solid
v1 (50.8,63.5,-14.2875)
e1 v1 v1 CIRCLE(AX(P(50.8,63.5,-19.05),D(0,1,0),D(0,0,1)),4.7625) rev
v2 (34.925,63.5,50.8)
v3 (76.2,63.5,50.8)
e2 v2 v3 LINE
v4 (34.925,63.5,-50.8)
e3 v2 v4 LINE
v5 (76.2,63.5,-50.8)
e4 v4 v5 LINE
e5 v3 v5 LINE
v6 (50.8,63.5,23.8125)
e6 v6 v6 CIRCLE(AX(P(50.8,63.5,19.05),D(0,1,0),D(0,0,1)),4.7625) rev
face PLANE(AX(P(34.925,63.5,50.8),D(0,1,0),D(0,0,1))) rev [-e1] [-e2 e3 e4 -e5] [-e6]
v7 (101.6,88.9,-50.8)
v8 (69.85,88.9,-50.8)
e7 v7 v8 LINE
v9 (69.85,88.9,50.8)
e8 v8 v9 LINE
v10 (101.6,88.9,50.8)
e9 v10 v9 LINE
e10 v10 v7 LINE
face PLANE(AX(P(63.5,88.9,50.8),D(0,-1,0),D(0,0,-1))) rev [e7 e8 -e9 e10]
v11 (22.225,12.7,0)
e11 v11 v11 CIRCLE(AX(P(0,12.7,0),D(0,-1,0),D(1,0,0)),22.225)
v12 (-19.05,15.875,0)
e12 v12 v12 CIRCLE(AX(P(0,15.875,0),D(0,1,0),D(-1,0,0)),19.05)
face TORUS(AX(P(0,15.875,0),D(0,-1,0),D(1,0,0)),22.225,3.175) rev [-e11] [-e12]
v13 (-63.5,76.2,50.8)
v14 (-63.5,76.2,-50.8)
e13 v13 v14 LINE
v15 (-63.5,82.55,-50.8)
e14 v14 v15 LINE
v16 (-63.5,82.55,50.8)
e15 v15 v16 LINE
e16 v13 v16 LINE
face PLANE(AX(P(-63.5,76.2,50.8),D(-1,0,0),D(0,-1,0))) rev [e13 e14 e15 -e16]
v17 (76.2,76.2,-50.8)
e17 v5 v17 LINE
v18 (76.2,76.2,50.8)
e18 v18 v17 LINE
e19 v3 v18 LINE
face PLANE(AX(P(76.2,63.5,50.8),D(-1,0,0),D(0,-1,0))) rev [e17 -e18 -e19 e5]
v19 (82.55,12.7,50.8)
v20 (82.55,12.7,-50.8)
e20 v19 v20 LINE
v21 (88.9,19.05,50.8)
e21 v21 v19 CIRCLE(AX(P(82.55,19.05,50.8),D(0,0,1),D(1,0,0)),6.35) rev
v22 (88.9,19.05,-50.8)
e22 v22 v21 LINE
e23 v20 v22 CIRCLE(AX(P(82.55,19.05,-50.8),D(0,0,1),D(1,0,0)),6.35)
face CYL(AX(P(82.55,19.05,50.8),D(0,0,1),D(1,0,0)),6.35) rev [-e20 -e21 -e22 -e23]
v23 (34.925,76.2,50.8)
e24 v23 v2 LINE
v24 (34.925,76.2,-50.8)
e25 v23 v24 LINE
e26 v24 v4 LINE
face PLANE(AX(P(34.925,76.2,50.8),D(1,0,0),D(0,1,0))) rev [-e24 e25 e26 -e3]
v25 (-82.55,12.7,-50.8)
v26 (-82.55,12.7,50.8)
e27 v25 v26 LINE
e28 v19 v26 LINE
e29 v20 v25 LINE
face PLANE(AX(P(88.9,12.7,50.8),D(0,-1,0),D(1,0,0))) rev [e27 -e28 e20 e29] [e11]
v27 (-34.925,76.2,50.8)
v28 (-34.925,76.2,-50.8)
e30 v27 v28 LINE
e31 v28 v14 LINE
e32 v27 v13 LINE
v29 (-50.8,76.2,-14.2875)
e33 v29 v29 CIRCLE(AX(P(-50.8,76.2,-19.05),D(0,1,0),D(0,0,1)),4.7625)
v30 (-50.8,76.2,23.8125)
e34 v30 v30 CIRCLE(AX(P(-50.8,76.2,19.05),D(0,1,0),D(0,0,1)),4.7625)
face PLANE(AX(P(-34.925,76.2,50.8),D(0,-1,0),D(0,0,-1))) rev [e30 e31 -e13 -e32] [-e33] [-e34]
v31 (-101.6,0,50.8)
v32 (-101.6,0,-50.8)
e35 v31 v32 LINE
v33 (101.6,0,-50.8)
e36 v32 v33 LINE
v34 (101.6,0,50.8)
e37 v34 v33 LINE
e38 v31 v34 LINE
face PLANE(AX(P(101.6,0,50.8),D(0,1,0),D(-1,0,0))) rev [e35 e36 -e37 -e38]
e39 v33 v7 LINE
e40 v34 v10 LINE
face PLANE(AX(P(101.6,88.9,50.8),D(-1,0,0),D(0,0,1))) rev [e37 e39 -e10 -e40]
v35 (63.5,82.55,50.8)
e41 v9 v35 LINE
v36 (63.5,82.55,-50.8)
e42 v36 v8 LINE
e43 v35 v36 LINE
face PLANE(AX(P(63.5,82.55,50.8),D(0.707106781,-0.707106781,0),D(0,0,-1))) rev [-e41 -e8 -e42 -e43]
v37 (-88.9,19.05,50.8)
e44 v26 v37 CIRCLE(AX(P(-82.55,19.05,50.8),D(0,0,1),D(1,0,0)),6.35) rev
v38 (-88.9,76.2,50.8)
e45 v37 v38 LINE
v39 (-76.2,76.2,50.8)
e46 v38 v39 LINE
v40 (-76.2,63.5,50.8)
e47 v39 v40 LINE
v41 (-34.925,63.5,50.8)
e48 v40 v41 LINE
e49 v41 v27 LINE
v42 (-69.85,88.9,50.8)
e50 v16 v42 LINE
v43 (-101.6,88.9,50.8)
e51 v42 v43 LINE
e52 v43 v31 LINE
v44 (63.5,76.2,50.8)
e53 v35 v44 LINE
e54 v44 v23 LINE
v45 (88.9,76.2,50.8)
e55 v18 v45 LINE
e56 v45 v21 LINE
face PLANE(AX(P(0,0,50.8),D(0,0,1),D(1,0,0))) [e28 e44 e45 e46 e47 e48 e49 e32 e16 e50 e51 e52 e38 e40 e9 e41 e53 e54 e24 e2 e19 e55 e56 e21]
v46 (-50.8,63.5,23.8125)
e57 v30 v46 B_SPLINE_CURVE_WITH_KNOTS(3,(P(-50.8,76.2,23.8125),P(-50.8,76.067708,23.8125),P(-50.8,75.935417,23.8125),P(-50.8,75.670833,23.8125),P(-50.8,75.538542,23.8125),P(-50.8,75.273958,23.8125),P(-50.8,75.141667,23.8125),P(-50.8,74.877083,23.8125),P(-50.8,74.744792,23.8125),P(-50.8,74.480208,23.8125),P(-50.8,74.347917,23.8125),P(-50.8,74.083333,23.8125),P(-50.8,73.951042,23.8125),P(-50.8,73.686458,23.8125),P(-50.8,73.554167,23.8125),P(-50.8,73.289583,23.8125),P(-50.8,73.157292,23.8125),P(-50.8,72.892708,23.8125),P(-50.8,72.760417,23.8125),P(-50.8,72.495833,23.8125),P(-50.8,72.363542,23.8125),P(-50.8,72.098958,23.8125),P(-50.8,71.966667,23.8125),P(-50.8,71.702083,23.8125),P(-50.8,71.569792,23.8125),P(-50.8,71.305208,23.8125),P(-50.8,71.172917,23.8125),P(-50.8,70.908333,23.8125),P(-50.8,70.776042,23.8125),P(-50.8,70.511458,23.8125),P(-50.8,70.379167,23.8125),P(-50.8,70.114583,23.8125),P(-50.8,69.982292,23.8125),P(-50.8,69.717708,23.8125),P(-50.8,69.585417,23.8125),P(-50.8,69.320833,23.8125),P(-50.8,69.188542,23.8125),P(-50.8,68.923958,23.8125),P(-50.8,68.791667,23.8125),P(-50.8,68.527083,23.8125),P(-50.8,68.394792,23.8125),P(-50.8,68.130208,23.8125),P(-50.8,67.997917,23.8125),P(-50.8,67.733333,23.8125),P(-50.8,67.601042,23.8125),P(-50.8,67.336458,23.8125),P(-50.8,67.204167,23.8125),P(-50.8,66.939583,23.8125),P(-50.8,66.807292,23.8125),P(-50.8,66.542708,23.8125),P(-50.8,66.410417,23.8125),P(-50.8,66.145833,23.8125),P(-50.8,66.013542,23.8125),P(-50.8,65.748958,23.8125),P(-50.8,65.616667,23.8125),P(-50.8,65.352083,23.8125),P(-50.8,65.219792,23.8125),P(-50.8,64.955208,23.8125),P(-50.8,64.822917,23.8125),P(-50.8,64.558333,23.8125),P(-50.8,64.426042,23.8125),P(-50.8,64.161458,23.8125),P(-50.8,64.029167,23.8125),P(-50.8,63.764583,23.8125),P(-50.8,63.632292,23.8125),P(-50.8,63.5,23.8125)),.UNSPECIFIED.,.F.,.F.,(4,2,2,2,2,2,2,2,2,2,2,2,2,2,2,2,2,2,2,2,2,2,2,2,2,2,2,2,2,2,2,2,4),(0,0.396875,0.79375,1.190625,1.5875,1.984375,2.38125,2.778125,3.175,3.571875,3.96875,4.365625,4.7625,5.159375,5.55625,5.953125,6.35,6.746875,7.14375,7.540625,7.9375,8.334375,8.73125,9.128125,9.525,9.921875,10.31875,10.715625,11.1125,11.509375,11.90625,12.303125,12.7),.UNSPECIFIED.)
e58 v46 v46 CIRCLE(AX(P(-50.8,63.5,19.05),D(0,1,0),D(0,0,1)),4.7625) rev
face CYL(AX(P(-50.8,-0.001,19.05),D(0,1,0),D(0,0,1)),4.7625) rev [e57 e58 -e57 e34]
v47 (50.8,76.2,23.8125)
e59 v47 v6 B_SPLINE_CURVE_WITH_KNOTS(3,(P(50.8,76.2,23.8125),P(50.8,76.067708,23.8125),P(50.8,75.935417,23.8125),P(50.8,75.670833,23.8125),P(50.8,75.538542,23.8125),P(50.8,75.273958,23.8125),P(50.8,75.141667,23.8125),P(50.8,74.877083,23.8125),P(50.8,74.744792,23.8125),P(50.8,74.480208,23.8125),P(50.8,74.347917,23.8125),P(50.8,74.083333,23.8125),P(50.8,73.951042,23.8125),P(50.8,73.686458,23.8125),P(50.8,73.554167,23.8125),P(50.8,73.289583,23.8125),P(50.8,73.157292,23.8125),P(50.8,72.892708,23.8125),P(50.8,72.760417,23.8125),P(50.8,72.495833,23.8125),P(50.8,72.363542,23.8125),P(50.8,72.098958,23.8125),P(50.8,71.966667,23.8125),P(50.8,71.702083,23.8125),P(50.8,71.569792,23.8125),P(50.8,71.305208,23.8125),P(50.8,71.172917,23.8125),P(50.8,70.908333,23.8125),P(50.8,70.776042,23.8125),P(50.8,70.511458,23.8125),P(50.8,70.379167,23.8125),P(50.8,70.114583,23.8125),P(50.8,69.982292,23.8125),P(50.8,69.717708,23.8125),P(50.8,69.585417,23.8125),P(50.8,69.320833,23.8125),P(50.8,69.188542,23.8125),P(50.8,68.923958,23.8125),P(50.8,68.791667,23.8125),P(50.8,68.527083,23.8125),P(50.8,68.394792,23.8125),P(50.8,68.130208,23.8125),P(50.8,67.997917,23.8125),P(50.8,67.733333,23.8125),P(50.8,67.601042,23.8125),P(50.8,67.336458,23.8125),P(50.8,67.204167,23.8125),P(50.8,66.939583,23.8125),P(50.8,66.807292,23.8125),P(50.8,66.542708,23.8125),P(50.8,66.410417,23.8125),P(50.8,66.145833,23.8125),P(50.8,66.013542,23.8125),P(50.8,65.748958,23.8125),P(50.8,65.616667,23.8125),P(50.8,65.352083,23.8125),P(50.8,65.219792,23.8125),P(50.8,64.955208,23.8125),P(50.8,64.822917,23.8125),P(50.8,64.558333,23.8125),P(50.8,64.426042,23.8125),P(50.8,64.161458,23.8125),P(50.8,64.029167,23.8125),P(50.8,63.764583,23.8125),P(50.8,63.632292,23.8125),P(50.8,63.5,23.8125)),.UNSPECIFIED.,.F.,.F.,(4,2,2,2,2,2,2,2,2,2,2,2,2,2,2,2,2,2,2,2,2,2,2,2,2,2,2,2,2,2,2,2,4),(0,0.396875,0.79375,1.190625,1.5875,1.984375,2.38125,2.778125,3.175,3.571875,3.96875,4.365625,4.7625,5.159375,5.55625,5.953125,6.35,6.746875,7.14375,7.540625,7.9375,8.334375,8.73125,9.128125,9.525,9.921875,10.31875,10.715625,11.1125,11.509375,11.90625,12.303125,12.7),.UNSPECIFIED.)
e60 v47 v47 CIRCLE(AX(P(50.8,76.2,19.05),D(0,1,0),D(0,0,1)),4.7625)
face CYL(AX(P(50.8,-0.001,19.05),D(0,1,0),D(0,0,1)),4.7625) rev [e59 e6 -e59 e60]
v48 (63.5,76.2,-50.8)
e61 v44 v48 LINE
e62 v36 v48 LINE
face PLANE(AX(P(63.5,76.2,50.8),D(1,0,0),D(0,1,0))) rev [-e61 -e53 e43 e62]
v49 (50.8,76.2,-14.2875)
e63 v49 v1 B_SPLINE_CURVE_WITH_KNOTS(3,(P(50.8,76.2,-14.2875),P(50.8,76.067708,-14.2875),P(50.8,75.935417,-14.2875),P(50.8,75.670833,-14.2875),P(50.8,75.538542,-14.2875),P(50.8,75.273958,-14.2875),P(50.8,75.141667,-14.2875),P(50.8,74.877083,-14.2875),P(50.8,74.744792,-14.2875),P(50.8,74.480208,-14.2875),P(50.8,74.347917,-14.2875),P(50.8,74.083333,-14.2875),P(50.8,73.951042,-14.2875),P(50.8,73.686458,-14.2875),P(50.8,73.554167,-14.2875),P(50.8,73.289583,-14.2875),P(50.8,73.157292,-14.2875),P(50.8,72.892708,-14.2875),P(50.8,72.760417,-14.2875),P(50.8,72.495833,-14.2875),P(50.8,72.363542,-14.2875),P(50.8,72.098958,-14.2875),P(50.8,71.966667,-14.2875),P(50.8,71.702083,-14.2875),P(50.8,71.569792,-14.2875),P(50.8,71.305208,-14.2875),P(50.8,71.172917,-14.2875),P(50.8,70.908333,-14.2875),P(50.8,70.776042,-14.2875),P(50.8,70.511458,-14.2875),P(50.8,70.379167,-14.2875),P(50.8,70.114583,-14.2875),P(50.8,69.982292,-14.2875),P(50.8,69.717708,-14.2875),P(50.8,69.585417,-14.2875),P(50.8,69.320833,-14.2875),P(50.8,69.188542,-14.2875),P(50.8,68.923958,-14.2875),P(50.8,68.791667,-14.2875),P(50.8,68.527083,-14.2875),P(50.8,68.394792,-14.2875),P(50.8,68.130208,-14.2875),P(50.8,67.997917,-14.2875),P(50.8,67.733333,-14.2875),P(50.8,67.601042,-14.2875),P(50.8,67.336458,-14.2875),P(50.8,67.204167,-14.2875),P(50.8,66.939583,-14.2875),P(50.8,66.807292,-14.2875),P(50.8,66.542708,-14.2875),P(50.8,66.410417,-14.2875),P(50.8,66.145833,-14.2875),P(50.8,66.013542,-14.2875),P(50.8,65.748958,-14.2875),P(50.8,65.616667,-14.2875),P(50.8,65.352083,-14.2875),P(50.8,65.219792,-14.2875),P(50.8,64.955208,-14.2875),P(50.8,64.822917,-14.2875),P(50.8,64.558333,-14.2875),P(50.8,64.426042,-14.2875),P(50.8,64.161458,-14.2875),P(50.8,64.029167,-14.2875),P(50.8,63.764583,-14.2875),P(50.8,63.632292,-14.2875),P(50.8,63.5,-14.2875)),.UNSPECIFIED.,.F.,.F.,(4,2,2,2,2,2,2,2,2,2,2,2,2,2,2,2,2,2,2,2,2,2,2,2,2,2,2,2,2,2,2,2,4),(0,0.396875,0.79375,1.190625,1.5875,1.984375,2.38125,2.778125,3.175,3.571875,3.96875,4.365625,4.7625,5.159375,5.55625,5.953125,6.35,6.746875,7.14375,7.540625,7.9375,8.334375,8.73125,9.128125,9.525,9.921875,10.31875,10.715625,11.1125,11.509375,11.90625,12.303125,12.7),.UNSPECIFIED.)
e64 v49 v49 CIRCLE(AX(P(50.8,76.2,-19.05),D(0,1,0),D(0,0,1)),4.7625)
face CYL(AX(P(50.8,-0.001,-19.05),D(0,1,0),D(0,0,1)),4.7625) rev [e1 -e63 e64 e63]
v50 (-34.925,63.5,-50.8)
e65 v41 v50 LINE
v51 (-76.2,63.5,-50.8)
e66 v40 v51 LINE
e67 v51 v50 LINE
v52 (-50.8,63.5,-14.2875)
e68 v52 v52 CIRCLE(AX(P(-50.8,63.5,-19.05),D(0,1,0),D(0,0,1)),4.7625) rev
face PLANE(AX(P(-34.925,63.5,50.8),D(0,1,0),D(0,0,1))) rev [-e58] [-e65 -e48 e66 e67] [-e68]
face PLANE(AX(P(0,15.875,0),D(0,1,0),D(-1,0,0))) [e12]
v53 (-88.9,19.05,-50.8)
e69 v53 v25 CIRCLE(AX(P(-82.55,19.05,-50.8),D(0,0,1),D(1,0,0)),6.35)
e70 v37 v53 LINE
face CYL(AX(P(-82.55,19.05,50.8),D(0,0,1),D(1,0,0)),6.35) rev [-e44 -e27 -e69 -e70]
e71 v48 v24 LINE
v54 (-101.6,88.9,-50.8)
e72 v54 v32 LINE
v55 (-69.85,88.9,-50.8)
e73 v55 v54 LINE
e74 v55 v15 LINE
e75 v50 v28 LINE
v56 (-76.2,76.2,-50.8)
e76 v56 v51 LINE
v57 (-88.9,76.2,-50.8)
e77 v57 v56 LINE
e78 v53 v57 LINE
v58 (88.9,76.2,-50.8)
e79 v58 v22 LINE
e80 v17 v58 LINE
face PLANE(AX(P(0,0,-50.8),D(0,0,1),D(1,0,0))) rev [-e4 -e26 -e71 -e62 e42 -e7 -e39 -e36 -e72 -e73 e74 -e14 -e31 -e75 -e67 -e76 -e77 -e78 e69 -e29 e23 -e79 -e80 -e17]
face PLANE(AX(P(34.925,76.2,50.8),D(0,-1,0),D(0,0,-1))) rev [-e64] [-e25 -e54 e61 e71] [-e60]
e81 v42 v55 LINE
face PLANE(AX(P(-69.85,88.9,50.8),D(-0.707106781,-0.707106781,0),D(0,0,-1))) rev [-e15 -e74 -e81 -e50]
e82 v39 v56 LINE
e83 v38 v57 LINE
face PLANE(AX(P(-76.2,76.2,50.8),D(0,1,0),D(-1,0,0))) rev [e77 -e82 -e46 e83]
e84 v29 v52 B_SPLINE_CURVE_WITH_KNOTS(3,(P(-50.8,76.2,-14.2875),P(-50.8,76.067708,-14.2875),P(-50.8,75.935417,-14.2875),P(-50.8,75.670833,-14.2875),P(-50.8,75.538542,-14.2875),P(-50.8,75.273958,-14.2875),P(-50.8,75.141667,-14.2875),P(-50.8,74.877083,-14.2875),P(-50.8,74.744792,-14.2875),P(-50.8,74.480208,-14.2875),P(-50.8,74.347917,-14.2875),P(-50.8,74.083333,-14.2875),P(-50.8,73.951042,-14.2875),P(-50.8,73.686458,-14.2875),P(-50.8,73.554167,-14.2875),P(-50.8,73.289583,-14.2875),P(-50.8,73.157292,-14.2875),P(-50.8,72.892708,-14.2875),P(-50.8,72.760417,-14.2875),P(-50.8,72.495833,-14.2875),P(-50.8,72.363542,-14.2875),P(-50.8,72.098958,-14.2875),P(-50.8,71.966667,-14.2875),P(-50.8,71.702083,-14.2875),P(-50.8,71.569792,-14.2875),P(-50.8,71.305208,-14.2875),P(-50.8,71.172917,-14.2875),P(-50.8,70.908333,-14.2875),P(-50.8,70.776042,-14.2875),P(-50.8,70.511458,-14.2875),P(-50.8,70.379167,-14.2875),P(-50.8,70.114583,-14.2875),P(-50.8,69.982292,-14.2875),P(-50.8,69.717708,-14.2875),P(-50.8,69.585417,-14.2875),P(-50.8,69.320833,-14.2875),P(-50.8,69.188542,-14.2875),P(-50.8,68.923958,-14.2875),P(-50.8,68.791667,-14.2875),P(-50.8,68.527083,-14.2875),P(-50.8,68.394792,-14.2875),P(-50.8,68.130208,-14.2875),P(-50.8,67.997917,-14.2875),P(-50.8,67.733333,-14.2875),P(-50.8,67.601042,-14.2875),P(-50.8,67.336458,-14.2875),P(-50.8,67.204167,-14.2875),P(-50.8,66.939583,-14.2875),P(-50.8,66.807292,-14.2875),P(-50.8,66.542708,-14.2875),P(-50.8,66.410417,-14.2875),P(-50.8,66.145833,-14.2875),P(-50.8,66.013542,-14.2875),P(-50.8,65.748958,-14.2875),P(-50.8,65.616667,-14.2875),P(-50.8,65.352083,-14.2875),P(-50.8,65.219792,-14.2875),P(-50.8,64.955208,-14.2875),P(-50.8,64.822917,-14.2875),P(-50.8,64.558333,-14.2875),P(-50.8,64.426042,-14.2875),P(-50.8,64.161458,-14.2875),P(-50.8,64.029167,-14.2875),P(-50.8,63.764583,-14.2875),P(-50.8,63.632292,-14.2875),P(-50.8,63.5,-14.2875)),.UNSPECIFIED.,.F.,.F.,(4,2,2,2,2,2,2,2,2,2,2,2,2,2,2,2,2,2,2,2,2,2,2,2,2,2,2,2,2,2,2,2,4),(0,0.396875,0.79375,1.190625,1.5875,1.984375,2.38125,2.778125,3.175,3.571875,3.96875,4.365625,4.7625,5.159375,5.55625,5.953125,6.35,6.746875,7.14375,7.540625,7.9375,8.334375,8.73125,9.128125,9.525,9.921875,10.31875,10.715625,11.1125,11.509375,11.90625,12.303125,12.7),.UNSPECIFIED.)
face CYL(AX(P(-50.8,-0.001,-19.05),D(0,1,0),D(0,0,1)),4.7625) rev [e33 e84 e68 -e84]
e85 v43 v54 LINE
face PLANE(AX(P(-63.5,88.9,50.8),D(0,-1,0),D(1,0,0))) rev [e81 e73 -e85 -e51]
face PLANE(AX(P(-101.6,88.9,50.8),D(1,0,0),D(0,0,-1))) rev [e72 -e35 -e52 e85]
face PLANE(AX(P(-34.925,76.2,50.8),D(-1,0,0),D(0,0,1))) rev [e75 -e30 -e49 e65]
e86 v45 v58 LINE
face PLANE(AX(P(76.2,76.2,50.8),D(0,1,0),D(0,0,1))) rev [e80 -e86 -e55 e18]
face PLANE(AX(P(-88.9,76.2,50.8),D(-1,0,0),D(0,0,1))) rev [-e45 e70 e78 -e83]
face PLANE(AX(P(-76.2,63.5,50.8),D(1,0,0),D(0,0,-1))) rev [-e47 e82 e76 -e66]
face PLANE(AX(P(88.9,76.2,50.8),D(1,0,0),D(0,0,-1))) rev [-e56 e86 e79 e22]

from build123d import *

# Parameters (mm, degrees)
BOSS_EXTRUDE1_DEPTH = 50.8
CUT_EXTRUDE1_REACH  = 138.783
SKETCH2_R           = 4.7625
SKETCH3_R           = 19.05
BOSS_EXTRUDE2_DEPTH = 3.175
FILLET1_R           = 6.35
FILLET2_R           = 3.175
CHAMFER1_SIZE       = 6.35


with BuildPart() as part:
    # Sketch1 → Boss-Extrude1 (new, symmetric)
    with BuildSketch(Plane.XY):
        Polygon((34.925, 76.2), (63.5, 76.2), (63.5, 88.9), (101.6, 88.9), (101.6, 0), (-101.6, 0), (-101.6, 88.9), (-63.5, 88.9), (-63.5, 76.2), (-34.925, 76.2), (-34.925, 63.5), (-76.2, 63.5), (-76.2, 76.2), (-88.9, 76.2), (-88.9, 12.7), (88.9, 12.7), (88.9, 76.2), (76.2, 76.2), (76.2, 63.5), (34.925, 63.5), align=None)
    extrude(amount=BOSS_EXTRUDE1_DEPTH, both=True)

    # Sketch2 → Cut-Extrude1 (cut, up to next)
    with BuildSketch(Plane(origin=(0, 76.2, 0), x_dir=(1, 0, 0), z_dir=(0, 1, 0)), mode=Mode.PRIVATE) as cut_extrude1_sk1:
        with Locations(Location((-50.8, 19.05, 0), (0, 0, 270))):
            Circle(SKETCH2_R)
    cut_extrude1_tool1 = extrude(cut_extrude1_sk1.sketch, amount=-CUT_EXTRUDE1_REACH, mode=Mode.PRIVATE) & part.part
    # Sketch2 → Cut-Extrude1 (cut, up to next)
    with BuildSketch(Plane(origin=(0, 76.2, 0), x_dir=(1, 0, 0), z_dir=(0, 1, 0)), mode=Mode.PRIVATE) as cut_extrude1_sk2:
        with Locations(Location((-50.8, -19.05, 0), (0, 0, 270))):
            Circle(SKETCH2_R)
    cut_extrude1_tool2 = extrude(cut_extrude1_sk2.sketch, amount=-CUT_EXTRUDE1_REACH, mode=Mode.PRIVATE) & part.part
    # Sketch2 → Cut-Extrude1 (cut, up to next)
    with BuildSketch(Plane(origin=(0, 76.2, 0), x_dir=(1, 0, 0), z_dir=(0, 1, 0)), mode=Mode.PRIVATE) as cut_extrude1_sk3:
        with Locations(Location((50.8, 19.05, 0), (0, 0, 270))):
            Circle(SKETCH2_R)
    cut_extrude1_tool3 = extrude(cut_extrude1_sk3.sketch, amount=-CUT_EXTRUDE1_REACH, mode=Mode.PRIVATE) & part.part
    # Sketch2 → Cut-Extrude1 (cut, up to next)
    with BuildSketch(Plane(origin=(0, 76.2, 0), x_dir=(1, 0, 0), z_dir=(0, 1, 0)), mode=Mode.PRIVATE) as cut_extrude1_sk4:
        with Locations(Location((50.8, -19.05, 0), (0, 0, 270))):
            Circle(SKETCH2_R)
    cut_extrude1_tool4 = extrude(cut_extrude1_sk4.sketch, amount=-CUT_EXTRUDE1_REACH, mode=Mode.PRIVATE) & part.part
    add(cut_extrude1_tool1.solids().sort_by_distance((-50.8, 76.2, -19.05))[0], mode=Mode.SUBTRACT)
    add(cut_extrude1_tool2.solids().sort_by_distance((-50.8, 76.2, 19.05))[0], mode=Mode.SUBTRACT)
    add(cut_extrude1_tool3.solids().sort_by_distance((50.8, 76.2, -19.05))[0], mode=Mode.SUBTRACT)
    add(cut_extrude1_tool4.solids().sort_by_distance((50.8, 76.2, 19.05))[0], mode=Mode.SUBTRACT)

    # Sketch3 → Boss-Extrude2 (add, symmetric)
    with BuildSketch(Plane(origin=(0, 12.7, 0), x_dir=(1, 0, 0), z_dir=(0, 1, 0))):
        Circle(SKETCH3_R)
    extrude(amount=BOSS_EXTRUDE2_DEPTH, both=True)

    # Fillet1
    fillet1_edges = [part.edges().sort_by_distance(p)[0] for p in [
        (-88.9, 12.7, 0),
        (88.9, 12.7, 0),
    ]]
    fillet(fillet1_edges, radius=FILLET1_R)

    # Fillet2
    fillet2_edges = [part.edges().sort_by_distance(p)[0] for p in [
        (-19.05, 12.7, 0),
    ]]
    fillet(fillet2_edges, radius=FILLET2_R - 0.0001)  # a hair under: the kernel refuses the full size

    # Chamfer1
    chamfer1_edges = [part.edges().sort_by_distance(p)[0] for p in [
        (63.5, 88.9, 0),
        (-63.5, 88.9, 0),
    ]]
    chamfer(chamfer1_edges, length=CHAMFER1_SIZE)


solid = part.part
